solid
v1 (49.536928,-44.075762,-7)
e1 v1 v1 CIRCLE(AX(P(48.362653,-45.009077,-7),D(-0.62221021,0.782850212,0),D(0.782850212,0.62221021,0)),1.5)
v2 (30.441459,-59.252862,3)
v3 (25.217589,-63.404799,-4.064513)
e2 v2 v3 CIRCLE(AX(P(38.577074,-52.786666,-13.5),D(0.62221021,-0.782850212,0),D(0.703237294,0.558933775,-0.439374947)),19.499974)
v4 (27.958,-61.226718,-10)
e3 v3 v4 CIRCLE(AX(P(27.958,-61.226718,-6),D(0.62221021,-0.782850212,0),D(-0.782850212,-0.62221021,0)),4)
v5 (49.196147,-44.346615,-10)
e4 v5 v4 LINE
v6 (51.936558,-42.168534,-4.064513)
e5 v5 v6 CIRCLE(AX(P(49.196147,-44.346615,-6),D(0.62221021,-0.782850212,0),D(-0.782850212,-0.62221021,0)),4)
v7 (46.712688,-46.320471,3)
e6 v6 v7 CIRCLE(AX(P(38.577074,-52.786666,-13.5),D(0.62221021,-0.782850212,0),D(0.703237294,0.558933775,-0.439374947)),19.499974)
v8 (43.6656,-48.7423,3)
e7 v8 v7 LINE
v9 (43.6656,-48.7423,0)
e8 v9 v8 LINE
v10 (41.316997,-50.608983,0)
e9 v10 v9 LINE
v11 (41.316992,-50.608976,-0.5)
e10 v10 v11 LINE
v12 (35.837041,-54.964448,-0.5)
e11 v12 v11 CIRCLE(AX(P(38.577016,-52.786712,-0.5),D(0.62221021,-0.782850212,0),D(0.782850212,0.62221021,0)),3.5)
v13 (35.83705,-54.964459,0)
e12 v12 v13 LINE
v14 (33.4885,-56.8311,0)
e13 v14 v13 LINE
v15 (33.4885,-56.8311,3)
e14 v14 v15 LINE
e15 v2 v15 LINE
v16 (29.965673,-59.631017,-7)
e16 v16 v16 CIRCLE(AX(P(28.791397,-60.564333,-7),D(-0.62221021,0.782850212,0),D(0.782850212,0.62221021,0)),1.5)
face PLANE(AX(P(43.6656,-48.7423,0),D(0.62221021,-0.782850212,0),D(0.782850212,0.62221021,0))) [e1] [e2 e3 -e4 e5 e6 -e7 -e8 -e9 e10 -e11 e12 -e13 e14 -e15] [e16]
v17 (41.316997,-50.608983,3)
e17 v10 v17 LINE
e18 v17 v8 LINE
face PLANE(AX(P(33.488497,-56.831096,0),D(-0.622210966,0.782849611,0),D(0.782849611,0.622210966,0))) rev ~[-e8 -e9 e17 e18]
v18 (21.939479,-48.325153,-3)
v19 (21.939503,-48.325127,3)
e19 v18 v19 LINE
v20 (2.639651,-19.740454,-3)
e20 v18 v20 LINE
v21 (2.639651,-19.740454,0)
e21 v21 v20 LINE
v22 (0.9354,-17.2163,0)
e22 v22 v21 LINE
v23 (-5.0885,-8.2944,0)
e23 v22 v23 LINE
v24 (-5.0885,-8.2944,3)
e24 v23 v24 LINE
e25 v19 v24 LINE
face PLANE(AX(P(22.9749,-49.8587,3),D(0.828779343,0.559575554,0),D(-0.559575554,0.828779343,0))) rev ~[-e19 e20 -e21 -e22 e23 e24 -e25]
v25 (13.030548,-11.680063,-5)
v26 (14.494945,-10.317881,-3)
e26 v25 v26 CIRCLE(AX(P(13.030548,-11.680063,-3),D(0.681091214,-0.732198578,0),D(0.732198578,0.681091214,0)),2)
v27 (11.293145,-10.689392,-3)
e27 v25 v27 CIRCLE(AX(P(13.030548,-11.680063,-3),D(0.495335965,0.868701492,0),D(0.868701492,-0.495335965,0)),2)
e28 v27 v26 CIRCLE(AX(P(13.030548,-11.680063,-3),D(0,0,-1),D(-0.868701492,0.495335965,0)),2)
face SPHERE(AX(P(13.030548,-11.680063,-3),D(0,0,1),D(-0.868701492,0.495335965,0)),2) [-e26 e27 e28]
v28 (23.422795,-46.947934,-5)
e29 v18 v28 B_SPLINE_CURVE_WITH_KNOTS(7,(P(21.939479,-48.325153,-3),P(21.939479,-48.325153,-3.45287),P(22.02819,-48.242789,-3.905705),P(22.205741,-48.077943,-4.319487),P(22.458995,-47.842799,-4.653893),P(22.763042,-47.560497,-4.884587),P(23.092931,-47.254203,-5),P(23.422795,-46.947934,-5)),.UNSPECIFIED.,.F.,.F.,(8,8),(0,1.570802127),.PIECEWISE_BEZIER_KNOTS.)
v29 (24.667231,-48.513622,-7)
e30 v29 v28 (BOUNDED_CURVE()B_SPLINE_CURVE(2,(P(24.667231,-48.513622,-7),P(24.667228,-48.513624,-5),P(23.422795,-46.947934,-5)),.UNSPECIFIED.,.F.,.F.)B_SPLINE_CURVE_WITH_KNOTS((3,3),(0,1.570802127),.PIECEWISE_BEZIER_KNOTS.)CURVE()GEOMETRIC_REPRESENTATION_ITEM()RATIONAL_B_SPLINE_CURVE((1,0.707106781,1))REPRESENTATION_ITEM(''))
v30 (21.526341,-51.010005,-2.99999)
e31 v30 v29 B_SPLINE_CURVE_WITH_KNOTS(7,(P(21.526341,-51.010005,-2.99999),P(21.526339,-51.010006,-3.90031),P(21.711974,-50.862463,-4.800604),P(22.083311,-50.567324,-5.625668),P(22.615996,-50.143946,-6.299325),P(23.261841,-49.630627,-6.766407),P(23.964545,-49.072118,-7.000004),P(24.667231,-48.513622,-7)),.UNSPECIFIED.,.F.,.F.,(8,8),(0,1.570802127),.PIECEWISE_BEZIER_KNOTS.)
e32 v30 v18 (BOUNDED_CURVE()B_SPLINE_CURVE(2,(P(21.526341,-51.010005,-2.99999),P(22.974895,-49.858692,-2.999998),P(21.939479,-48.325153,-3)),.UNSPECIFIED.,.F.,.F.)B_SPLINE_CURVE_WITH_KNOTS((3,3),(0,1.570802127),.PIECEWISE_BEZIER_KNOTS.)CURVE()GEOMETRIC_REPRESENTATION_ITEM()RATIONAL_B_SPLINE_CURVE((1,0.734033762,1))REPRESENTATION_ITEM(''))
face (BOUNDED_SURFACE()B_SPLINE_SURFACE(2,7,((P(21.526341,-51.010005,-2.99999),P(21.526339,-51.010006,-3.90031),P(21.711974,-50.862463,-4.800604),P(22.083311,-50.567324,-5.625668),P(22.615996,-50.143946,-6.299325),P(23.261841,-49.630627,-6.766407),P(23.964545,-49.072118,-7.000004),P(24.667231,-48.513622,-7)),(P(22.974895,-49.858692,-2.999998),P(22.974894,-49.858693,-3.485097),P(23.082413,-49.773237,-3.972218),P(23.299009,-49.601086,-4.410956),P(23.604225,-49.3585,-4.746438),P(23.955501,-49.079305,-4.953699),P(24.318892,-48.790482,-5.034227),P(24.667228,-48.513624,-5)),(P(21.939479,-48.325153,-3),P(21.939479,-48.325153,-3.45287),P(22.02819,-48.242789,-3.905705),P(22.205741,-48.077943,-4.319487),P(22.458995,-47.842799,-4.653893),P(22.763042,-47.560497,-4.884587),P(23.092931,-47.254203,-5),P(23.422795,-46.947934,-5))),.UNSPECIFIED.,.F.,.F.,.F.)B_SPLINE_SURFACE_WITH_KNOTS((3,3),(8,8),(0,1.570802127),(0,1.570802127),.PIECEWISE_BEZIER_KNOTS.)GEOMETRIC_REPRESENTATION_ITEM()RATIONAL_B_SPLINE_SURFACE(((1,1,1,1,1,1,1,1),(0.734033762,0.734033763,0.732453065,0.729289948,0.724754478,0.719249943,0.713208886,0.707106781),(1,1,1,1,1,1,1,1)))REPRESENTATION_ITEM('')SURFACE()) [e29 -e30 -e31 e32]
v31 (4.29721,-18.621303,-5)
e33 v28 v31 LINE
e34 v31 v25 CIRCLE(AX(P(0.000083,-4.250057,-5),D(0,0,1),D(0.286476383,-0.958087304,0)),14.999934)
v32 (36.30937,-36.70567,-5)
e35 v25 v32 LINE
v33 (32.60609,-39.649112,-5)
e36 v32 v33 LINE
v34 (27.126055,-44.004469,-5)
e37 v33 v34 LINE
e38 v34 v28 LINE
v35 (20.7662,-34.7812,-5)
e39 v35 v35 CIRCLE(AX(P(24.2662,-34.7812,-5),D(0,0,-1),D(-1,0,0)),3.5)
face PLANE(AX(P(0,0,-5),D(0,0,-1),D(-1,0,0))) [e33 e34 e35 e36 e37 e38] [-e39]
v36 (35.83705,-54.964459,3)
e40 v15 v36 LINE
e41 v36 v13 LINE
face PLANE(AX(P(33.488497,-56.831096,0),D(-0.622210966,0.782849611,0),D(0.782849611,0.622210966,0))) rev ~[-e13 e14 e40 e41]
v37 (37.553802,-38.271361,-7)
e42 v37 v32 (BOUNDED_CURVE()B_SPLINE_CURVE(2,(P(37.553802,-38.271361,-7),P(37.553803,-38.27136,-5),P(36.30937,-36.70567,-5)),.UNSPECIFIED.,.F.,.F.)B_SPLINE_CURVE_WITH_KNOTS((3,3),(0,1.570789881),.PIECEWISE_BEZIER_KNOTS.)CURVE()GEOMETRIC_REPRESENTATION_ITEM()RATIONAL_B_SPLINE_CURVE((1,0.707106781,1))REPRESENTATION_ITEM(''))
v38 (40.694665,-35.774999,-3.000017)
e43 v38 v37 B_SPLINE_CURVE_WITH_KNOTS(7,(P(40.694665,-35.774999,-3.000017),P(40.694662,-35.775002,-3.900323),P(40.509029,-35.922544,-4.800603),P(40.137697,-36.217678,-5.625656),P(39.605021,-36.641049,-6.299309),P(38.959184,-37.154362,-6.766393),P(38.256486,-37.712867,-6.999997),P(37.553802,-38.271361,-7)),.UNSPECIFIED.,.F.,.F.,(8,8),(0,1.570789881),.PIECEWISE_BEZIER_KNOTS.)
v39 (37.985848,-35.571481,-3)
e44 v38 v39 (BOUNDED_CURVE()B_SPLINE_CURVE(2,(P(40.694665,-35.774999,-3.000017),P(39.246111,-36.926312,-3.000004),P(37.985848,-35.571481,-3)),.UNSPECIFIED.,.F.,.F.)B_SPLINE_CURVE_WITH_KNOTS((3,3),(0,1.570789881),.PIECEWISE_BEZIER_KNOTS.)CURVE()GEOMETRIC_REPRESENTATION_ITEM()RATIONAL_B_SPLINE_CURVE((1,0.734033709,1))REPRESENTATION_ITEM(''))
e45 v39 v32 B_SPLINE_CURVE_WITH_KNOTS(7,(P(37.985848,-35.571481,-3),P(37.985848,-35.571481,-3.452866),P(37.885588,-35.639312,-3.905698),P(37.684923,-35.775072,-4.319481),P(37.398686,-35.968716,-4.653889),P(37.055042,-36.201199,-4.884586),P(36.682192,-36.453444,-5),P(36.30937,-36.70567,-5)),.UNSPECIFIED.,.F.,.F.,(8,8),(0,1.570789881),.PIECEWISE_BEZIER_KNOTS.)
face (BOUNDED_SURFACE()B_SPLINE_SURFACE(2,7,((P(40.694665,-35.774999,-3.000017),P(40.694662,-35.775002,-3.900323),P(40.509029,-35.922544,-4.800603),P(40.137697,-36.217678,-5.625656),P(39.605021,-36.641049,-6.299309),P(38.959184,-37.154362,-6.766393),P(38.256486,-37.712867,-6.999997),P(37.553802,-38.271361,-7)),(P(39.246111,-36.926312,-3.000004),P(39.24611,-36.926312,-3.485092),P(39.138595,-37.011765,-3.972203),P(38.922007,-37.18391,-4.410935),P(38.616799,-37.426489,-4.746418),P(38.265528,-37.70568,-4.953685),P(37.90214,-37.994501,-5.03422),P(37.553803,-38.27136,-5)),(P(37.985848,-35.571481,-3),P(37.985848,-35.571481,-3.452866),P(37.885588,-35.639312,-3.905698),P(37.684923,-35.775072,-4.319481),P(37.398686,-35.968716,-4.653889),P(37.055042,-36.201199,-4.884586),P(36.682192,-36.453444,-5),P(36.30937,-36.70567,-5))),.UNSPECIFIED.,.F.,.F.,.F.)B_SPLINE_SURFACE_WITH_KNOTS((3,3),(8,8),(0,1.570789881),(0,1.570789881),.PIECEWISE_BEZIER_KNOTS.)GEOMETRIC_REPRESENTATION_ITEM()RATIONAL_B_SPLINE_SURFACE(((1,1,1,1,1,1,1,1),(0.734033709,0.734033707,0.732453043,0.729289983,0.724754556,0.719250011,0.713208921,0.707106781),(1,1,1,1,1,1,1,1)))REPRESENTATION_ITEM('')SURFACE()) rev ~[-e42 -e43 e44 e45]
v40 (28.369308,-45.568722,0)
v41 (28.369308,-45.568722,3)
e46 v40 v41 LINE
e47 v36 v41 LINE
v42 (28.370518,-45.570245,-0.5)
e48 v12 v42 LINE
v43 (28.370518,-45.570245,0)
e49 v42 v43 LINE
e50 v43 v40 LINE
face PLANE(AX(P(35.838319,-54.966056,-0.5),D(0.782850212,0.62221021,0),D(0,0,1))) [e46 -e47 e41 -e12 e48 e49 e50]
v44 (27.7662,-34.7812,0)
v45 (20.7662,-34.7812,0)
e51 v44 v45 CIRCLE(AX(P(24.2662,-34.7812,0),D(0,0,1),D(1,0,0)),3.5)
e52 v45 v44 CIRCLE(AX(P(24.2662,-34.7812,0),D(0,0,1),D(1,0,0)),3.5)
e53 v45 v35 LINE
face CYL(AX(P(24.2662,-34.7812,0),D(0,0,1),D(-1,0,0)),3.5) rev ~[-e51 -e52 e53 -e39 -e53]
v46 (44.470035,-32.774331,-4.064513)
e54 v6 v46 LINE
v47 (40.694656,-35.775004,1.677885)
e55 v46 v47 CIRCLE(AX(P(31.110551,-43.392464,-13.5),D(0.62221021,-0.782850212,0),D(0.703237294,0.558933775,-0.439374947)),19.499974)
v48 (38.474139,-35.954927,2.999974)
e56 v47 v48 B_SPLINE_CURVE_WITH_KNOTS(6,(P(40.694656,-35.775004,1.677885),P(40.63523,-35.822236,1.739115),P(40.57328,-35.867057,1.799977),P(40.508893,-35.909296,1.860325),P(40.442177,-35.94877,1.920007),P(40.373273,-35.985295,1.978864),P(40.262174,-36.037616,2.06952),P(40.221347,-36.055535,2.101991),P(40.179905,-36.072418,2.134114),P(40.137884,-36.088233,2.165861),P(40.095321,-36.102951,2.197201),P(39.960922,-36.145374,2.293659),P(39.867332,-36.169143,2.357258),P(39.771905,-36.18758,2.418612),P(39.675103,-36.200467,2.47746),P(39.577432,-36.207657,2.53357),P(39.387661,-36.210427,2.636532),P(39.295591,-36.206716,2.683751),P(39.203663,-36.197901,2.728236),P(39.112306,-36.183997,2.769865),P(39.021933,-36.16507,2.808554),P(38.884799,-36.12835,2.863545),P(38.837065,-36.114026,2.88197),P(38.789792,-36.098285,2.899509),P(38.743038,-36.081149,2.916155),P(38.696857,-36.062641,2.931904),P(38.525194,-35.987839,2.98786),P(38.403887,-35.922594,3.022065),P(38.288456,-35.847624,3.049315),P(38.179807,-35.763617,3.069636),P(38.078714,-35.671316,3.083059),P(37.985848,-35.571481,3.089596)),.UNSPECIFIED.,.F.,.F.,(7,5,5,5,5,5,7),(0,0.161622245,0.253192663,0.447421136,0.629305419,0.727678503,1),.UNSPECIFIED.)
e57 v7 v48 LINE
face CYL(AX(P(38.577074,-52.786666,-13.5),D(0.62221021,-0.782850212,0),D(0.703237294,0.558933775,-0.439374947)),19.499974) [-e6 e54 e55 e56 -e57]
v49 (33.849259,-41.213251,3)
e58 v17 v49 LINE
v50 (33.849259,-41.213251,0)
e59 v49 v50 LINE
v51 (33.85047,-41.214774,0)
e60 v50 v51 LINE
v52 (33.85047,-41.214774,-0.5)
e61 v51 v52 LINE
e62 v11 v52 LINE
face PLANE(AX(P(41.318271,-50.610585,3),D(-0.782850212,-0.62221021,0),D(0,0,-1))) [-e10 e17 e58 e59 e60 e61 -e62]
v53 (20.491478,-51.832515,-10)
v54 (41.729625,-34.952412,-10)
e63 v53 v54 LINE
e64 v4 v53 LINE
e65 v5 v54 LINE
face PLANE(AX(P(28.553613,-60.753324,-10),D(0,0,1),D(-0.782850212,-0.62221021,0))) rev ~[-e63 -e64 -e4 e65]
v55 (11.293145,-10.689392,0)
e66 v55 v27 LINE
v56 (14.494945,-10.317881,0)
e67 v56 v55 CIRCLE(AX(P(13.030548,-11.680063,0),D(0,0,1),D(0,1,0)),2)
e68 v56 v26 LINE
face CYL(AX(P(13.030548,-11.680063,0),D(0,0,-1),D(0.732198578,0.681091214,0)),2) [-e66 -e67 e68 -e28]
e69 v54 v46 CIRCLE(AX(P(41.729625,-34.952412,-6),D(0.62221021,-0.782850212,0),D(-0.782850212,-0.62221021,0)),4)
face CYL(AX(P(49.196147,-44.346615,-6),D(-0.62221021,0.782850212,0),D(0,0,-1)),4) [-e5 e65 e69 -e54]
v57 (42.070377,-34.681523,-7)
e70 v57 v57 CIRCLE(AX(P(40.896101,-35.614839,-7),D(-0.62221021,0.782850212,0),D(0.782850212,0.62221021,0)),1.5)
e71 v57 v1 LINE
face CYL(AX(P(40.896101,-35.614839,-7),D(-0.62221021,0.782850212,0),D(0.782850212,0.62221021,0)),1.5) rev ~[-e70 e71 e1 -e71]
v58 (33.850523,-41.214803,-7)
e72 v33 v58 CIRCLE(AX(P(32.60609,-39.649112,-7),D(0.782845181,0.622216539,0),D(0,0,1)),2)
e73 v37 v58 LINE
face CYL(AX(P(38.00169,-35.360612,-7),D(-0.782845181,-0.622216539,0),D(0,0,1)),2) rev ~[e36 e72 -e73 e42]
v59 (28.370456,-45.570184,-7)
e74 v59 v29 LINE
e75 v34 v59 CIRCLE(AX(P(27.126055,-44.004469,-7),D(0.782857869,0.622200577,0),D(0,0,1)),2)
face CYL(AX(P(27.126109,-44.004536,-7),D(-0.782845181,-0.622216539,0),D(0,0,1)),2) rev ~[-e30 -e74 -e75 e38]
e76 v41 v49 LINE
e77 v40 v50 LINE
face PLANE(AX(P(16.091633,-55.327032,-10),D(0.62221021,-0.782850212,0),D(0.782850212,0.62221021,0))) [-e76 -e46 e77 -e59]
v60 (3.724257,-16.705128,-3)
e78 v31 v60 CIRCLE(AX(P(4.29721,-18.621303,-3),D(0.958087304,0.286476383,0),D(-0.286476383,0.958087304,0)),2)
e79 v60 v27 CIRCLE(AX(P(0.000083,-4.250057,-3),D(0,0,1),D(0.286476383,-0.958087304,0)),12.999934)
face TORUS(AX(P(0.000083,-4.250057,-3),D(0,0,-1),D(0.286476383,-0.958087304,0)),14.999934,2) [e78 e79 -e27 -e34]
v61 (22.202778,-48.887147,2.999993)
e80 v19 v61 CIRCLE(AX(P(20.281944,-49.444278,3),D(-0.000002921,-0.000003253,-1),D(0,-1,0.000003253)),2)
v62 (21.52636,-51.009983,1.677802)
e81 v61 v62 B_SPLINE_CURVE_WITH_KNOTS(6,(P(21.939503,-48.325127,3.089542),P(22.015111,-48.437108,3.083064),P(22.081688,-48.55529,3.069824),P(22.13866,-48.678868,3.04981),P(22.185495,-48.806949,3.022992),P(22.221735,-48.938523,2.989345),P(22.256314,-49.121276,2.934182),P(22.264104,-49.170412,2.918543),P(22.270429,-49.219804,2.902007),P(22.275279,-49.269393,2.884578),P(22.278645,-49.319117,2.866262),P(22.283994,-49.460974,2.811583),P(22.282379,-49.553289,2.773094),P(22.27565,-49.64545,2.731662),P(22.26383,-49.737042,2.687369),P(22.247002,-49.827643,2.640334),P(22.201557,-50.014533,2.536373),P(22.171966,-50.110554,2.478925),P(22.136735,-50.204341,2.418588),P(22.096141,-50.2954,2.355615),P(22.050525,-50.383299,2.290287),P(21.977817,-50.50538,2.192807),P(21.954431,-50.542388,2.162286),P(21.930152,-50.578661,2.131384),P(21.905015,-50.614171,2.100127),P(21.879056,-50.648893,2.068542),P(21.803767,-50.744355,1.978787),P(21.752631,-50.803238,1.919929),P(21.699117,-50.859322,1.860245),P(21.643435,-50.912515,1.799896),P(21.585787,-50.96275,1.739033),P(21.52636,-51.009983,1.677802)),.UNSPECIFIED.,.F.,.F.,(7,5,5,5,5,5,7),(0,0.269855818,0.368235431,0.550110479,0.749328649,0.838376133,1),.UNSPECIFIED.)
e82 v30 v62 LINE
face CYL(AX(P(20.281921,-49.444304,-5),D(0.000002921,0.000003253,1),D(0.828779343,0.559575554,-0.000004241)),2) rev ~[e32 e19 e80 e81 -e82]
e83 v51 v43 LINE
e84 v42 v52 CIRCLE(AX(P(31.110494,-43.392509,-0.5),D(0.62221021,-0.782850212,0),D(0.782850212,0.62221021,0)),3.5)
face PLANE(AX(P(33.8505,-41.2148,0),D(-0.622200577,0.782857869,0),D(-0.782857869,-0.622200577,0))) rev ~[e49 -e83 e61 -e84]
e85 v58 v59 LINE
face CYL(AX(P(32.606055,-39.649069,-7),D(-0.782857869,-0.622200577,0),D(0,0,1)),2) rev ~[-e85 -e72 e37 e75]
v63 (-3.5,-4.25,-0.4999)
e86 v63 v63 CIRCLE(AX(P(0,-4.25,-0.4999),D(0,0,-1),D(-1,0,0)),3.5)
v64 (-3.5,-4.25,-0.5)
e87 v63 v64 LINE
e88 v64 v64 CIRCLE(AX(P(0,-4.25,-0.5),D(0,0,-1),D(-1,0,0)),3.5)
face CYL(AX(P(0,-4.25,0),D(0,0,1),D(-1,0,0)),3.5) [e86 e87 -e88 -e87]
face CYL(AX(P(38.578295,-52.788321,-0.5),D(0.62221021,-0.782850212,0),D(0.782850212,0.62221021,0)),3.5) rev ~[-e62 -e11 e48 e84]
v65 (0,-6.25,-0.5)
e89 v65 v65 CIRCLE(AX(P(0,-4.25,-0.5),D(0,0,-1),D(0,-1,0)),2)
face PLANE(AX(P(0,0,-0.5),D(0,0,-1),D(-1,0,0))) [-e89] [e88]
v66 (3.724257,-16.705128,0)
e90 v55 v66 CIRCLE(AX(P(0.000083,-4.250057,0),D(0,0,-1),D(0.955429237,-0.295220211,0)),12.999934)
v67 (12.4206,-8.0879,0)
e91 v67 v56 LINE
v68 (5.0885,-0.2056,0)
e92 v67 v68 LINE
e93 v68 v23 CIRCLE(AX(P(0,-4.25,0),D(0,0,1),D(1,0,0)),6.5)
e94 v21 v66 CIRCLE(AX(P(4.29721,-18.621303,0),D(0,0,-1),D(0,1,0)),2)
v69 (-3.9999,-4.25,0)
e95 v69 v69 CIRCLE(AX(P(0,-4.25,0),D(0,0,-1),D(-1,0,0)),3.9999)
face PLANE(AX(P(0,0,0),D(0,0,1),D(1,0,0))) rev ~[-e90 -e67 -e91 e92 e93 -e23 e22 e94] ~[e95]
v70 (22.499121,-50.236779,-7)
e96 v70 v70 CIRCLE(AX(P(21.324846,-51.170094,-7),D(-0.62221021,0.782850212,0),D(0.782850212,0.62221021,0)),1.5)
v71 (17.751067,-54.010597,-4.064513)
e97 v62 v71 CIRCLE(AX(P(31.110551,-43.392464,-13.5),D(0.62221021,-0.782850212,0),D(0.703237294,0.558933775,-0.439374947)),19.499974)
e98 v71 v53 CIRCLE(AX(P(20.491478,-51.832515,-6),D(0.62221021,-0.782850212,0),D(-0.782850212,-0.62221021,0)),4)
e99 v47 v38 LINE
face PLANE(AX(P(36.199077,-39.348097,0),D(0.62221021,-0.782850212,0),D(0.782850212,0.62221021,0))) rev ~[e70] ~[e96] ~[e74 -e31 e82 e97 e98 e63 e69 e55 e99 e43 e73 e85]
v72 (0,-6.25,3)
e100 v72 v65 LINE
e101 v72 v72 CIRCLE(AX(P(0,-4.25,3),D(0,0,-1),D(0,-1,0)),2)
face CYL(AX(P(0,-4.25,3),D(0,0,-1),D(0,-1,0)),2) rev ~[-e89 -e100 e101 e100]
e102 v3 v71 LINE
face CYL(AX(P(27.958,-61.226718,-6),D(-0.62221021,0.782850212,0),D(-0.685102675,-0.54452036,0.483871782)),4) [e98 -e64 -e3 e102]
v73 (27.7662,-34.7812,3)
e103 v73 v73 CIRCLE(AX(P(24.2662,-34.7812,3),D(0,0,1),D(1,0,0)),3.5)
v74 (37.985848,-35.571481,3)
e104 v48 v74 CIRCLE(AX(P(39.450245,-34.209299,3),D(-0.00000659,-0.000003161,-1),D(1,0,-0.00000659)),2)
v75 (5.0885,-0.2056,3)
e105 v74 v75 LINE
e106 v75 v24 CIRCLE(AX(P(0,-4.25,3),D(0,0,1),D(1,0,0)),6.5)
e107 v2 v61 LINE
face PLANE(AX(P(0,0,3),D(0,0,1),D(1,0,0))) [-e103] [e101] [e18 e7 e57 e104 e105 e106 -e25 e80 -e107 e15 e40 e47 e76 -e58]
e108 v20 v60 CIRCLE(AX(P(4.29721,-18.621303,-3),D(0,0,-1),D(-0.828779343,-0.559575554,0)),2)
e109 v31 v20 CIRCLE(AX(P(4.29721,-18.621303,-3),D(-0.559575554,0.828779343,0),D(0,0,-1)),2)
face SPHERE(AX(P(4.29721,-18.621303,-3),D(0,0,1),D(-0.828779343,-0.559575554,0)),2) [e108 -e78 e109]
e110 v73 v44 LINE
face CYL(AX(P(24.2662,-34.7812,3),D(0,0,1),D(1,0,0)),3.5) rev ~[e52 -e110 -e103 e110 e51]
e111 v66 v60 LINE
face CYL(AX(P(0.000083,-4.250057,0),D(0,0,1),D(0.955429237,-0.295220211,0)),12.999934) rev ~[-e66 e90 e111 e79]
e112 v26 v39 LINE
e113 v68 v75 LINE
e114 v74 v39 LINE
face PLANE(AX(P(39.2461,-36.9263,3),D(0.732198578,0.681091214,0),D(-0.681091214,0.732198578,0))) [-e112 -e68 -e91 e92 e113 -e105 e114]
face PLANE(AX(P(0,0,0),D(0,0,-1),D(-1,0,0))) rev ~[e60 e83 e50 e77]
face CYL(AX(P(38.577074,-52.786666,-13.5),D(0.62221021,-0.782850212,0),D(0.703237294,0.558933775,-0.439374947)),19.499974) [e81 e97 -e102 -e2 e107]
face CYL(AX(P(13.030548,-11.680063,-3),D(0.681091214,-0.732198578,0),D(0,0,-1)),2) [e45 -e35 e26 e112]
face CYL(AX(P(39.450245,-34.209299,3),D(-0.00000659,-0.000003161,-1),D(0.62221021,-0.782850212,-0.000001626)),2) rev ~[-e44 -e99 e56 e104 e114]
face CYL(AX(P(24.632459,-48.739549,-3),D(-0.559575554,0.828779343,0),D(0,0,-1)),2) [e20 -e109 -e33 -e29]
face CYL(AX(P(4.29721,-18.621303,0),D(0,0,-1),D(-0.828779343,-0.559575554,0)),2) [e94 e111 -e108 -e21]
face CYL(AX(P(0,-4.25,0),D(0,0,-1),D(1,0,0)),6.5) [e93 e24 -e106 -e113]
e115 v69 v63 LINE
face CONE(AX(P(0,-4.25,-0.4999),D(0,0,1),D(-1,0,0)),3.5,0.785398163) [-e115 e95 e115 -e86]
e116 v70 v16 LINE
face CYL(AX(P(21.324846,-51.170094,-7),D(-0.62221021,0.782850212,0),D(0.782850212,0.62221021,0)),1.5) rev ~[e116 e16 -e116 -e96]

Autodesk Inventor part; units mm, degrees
ref_plane "YZ Plane" through (0, 0, 0) normal (1, 0, 0) x (0, 1, 0)
ref_plane "XY Plane" through (0, 0, 0) normal (0, 0, 1) x (1, 0, 0)
sketch "Skizze1" plane through (0, 0, 0) normal (0, 0, 1) x (1, 0, 0)
  line L0 (23.3115, -64.9198) -> (53.8426, -40.6536) projected
  circle A0 centre (0, -4.25) radius 6.5
  line L1 (43.6656, -48.7423) -> (33.4885, -56.8311)
  line L2 (33.4885, -56.8311) -> (-5.0885, -8.2944)
  line L3 (-5.0885, -8.2944) -> (5.0885, -0.2056)
  line L4 (5.0885, -0.2056) -> (43.6656, -48.7423)
  point P0 (0, 0)
  dimension "d0" = 13
extrude "Extrusion1" add sketch "Skizze1" along normal blind 3
sketch "Skizze2" plane through (43.6656, -48.7423, 0) normal (0.6222102, -0.7828502, 0) x (0.7828502, 0.6222102, 0)
  circle A0 centre (-17.7583, -20) radius 1.5 projected
  circle A1 centre (4.7583, -20) radius 1.5 projected
  circle A2 centre (-6.5, -0.5) radius 1.5 projected
  line L0 (-23, -30.5) -> (10, -30.5) projected
  line L1 (10, -30.5) -> (10, -26.4615) projected
  arc A3 (11.0169, -22.0678) -> (10, -26.4615) centre (20, -26.4615) ccw projected
  arc A4 (11.0169, -22.0678) -> (-24.0169, -22.0678) centre (-6.5, -13.5) ccw projected
  arc A5 (-23, -26.4615) -> (-24.0169, -22.0678) centre (-33, -26.4615) ccw projected
  line L2 (-23, -26.4615) -> (-23, -30.5) projected
  line L3 (12.6833, -10) -> (-25.6833, -10)
  line L4 (-104.8912, -12) -> (94.8547, -12)
  line L5 (-13, 3) -> (0, 3) projected
  line L6 (3.8923, 3) -> (-16.8923, 3)
  line L7 (-21.75, -5.4123) -> (-19, -3.8246) projected
  line L8 (-19, -3.8246) -> (-16.25, -5.4123) projected
  line L9 (-16.25, -5.4123) -> (-16.25, -8.5877) projected
  line L10 (-16.25, -8.5877) -> (-19, -10.1754) projected
  line L11 (-19, -10.1754) -> (-21.75, -8.5877) projected
  line L12 (-21.75, -8.5877) -> (-21.75, -5.4123) projected
  line L13 (3.25, -5.4123) -> (6, -3.8246) projected
  line L14 (6, -3.8246) -> (8.75, -5.4123) projected
  line L15 (8.75, -5.4123) -> (8.75, -8.5877) projected
  line L16 (8.75, -8.5877) -> (6, -10.1754) projected
  line L17 (6, -10.1754) -> (3.25, -8.5877) projected
  line L18 (3.25, -8.5877) -> (3.25, -5.4123) projected
  circle A6 centre (-6.5, -13.5) radius 5 projected
  point P0 (-3.8556, 0)
  dimension "d3" = 2
extrude "Extrusion2" add sketch "Skizze2" against normal blind 12 contours A4 L6 L5 L3 L16 L15 L14 L13 L18 L17 A6 L10 L9 L8 L7 L12 L11 | L11 L12 L7 L8 L9 L10 L3 | A6 L3 | L3 L17 L18 L13 L14 L15 L16
sketch "Skizze3" plane through (0, 0, 3) normal (0, 0, 1) x (1, 0, 0)
  line L0 (36.199, -39.3481) -> (5.0885, -0.2056) projected
  arc A0 (5.0885, -0.2056) -> (-5.0885, -8.2944) centre (0, -4.25) ccw projected
  line L1 (-5.0885, -8.2944) -> (26.022, -47.4369) projected
  line L2 (22.9749, -49.8587) -> (26.022, -47.4369) projected
  line L3 (30.4414, -59.2529) -> (22.9749, -49.8587) projected
  line L4 (46.7127, -46.3205) -> (30.4414, -59.2529) projected
  line L5 (46.7127, -46.3205) -> (39.2461, -36.9263) projected
  line L6 (36.199, -39.3481) -> (39.2461, -36.9263) projected
  line L7 (22.9749, -49.8587) -> (-5.0885, -8.2944)
  line L8 (39.2461, -36.9263) -> (5.0885, -0.2056)
  point P0 (0, 0)
extrude "Extrusion3" add sketch "Skizze3" against normal up to surface (3 mm away) contours L0 L8 L6 | L1 L2 L7
sketch "Skizze4" plane through (23.5594, -64.7228, -10) normal (0.6222102, -0.7828502, 0) x (0.7828502, 0.6222102, 0)
  line L0 (29.5756, 13) -> (8.791, 13) projected
  arc A0 (8.791, 13) -> (0, 0) centre (19.1833, -3.5) ccw projected
  line L1 (0, 0) -> (38.3667, 0) projected
  arc A1 (38.3667, 0) -> (29.5756, 13) centre (19.1833, -3.5) ccw projected
  arc A2 (17.7691, 10) -> (20.5975, 10) centre (19.1833, 9.5) ccw projected
  line L2 (17.7691, 10) -> (20.5975, 10) projected
  circle A3 centre (19.1833, 9.5) radius 1.5
  circle A4 centre (19.1833, 9.5) radius 3.5
  point P0 (21.8277, 10)
  dimension "d8" = 7
extrude "Extrusion4" cut sketch "Skizze4" against normal blind 12 contours A4 | L2 A2 | A3 L2
sketch "Skizze6" plane through (23.5594, -64.7228, -10) normal (0.6222102, -0.7828502, 0) x (0.7828502, 0.6222102, 0)
  circle A0 centre (19.1833, 9.5) radius 3.5 projected
  line L0 (29.5756, 13) -> (19.1833, 13) construction
  arc A1 (8.791, 13) -> (0, 0) centre (19.1833, -3.5) ccw construction
  line L1 (0, 0) -> (38.3667, 0) construction
  arc A2 (38.3667, 0) -> (29.5756, 13) centre (19.1833, -3.5) ccw construction
  line L2 (15.6833, 13) -> (22.6833, 13)
  line L3 (22.6833, 13) -> (22.6833, 9.5)
  line L4 (22.6833, 9.5) -> (15.6833, 9.5)
  line L5 (15.6833, 9.5) -> (15.6833, 13)
  circle A3 centre (19.1833, 9.5) radius 3.5 projected
  line L6 (19.1833, 13) -> (8.791, 13) projected
  point P0 (21.8277, 10)
  point P1 (21.0706, 13)
  point P2 (17.4651, 13)
extrude "Extrusion6" cut sketch "Skizze6" against normal up to surface (12 mm away) contours L4 A0 | A0 L2 L3 | A0 L5 L2 picked at (20.0662, 10.487)
sketch "Skizze7" plane through (36.199, -39.3481, 0) normal (-0.6222102, 0.7828502, 0) x (0.7828502, 0.6222102, 0)
  line L0 (-16.8923, -3) -> (-16.8923, 0) projected
  line L1 (-16.8923, 0) -> (-10, 0) projected
  line L2 (3.8923, 0) -> (3.8923, -3) projected
  arc A0 (3.8923, -3) -> (12.6833, 10) centre (-6.5, 13.5) ccw projected
  line L3 (12.6833, 10) -> (-25.6833, 10) projected
  arc A1 (-25.6833, 10) -> (-16.8923, -3) centre (-6.5, 13.5) ccw projected
  circle A2 centre (-19, 7) radius 1.5 projected
  circle A3 centre (6, 7) radius 1.5 projected
  line L4 (-3, 0.5) -> (-3, 0) projected
  line L5 (3.8923, 0) -> (-3, 0) projected
  line L6 (-10, 0) -> (-10, 0.5) projected
  arc A4 (-3, 0.5) -> (-10, 0.5) centre (-6.5, 0.5) ccw projected
  point P0 (-3.8556, 0)
extrude "Extrusion7" cut sketch "Skizze7" against normal through all contours A2 | A3
sketch "Skizze8" plane through (0, 0, 0) normal (0, 0, -1) x (-1, 0, 0)
  line L0 (-22.9749, -49.8587) -> (-28.3705, -45.5702) projected
  line L1 (-22.9749, -49.8587) -> (5.0885, -8.2944) projected
  arc A0 (5.0885, -8.2944) -> (-5.0885, -0.2056) centre (0, -4.25) ccw projected
  line L2 (-5.0885, -0.2056) -> (-39.2461, -36.9263) projected
  circle A1 centre (0, -4.25) radius 3.5
  line L3 (-33.8505, -41.2148) -> (-28.3705, -45.5702) projected
  line L4 (-39.2461, -36.9263) -> (-33.8505, -41.2148) projected
  point P0 (0, 0)
  dimension "d17" = 7
extrude "Extrusion8" add sketch "Skizze8" along normal blind 0.5 contours A1
chamfer "Fase1" distance 0.5 angle 45 1 edges at (3.5, -4.25, 0)
sketch "Skizze9" plane through (0, 0, 3) normal (0, 0, 1) x (1, 0, 0)
  circle A0 centre (0, -4.25) radius 3.5 projected
  point P0 (0, 0)
hole "Bohrung1" at (0, -4.25, 3) direction (0, 0, -1) diameter 4 end through all
sketch "Skizze10" plane through (0, 0, 3) normal (0, 0, 1) x (1, 0, 0)
  circle A0 centre (24.2662, -34.7812) radius 3.5
  point P0 (0, 0)
  dimension "d30" = 7
extrude "Extrusion9" cut sketch "Skizze10" against normal through all
sketch "Skizze11" plane through (0, 0, 0) normal (0, 0, -1) x (-1, 0, 0)
  circle A0 centre (-24.2662, -34.7812) radius 3.5 projected
  line L0 (-22.9749, -49.8587) -> (-28.3705, -45.5702) projected
  line L1 (-22.9749, -49.8587) -> (5.0885, -8.2944) projected
  arc A1 (5.0885, -8.2944) -> (-5.0885, -0.2056) centre (0, -4.25) ccw projected
  line L2 (-5.0885, -0.2056) -> (-39.2461, -36.9263) projected
  circle A2 centre (0, -4.25) radius 4 projected
  arc A3 (-12.4206, -8.0879) -> (-0.9354, -17.2163) centre (0, -4.25) ccw
  line L3 (-22.9749, -49.8587) -> (5.0885, -8.2944) projected
  line L4 (-33.8505, -41.2148) -> (-28.3705, -45.5702) projected
  line L5 (-39.2461, -36.9263) -> (-33.8505, -41.2148) projected
  point P0 (0, 0)
  dimension "d33" = 13
extrude "Extrusion10" add sketch "Skizze11" along normal blind 5 contours L0 L4 L5 L2 A3 L1
fillet "Rundung1" radius 2 2 edges at (0.9354, -17.2163, -2.5) (12.4206, -8.0879, -2.5)
fillet "Rundung2" radius 2 8 edges at (2.4138, -17.9483, -5) (8.0887, -14.4271, -5) (12.8, -9.6934, -5) (26.8705, -23.6221, -5) (12.8073, -34.7996, -5) (22.9749, -49.8587, -1) (39.2461, -36.9263, -1) (31.1105, -43.3925, -5)
fillet "Rundung2" radius 4 2 edges at (49.8614, -36.1536, -10) (19.8261, -60.0257, -10)
properties part number "Mount_B" material "ABS-Kunststoff"
